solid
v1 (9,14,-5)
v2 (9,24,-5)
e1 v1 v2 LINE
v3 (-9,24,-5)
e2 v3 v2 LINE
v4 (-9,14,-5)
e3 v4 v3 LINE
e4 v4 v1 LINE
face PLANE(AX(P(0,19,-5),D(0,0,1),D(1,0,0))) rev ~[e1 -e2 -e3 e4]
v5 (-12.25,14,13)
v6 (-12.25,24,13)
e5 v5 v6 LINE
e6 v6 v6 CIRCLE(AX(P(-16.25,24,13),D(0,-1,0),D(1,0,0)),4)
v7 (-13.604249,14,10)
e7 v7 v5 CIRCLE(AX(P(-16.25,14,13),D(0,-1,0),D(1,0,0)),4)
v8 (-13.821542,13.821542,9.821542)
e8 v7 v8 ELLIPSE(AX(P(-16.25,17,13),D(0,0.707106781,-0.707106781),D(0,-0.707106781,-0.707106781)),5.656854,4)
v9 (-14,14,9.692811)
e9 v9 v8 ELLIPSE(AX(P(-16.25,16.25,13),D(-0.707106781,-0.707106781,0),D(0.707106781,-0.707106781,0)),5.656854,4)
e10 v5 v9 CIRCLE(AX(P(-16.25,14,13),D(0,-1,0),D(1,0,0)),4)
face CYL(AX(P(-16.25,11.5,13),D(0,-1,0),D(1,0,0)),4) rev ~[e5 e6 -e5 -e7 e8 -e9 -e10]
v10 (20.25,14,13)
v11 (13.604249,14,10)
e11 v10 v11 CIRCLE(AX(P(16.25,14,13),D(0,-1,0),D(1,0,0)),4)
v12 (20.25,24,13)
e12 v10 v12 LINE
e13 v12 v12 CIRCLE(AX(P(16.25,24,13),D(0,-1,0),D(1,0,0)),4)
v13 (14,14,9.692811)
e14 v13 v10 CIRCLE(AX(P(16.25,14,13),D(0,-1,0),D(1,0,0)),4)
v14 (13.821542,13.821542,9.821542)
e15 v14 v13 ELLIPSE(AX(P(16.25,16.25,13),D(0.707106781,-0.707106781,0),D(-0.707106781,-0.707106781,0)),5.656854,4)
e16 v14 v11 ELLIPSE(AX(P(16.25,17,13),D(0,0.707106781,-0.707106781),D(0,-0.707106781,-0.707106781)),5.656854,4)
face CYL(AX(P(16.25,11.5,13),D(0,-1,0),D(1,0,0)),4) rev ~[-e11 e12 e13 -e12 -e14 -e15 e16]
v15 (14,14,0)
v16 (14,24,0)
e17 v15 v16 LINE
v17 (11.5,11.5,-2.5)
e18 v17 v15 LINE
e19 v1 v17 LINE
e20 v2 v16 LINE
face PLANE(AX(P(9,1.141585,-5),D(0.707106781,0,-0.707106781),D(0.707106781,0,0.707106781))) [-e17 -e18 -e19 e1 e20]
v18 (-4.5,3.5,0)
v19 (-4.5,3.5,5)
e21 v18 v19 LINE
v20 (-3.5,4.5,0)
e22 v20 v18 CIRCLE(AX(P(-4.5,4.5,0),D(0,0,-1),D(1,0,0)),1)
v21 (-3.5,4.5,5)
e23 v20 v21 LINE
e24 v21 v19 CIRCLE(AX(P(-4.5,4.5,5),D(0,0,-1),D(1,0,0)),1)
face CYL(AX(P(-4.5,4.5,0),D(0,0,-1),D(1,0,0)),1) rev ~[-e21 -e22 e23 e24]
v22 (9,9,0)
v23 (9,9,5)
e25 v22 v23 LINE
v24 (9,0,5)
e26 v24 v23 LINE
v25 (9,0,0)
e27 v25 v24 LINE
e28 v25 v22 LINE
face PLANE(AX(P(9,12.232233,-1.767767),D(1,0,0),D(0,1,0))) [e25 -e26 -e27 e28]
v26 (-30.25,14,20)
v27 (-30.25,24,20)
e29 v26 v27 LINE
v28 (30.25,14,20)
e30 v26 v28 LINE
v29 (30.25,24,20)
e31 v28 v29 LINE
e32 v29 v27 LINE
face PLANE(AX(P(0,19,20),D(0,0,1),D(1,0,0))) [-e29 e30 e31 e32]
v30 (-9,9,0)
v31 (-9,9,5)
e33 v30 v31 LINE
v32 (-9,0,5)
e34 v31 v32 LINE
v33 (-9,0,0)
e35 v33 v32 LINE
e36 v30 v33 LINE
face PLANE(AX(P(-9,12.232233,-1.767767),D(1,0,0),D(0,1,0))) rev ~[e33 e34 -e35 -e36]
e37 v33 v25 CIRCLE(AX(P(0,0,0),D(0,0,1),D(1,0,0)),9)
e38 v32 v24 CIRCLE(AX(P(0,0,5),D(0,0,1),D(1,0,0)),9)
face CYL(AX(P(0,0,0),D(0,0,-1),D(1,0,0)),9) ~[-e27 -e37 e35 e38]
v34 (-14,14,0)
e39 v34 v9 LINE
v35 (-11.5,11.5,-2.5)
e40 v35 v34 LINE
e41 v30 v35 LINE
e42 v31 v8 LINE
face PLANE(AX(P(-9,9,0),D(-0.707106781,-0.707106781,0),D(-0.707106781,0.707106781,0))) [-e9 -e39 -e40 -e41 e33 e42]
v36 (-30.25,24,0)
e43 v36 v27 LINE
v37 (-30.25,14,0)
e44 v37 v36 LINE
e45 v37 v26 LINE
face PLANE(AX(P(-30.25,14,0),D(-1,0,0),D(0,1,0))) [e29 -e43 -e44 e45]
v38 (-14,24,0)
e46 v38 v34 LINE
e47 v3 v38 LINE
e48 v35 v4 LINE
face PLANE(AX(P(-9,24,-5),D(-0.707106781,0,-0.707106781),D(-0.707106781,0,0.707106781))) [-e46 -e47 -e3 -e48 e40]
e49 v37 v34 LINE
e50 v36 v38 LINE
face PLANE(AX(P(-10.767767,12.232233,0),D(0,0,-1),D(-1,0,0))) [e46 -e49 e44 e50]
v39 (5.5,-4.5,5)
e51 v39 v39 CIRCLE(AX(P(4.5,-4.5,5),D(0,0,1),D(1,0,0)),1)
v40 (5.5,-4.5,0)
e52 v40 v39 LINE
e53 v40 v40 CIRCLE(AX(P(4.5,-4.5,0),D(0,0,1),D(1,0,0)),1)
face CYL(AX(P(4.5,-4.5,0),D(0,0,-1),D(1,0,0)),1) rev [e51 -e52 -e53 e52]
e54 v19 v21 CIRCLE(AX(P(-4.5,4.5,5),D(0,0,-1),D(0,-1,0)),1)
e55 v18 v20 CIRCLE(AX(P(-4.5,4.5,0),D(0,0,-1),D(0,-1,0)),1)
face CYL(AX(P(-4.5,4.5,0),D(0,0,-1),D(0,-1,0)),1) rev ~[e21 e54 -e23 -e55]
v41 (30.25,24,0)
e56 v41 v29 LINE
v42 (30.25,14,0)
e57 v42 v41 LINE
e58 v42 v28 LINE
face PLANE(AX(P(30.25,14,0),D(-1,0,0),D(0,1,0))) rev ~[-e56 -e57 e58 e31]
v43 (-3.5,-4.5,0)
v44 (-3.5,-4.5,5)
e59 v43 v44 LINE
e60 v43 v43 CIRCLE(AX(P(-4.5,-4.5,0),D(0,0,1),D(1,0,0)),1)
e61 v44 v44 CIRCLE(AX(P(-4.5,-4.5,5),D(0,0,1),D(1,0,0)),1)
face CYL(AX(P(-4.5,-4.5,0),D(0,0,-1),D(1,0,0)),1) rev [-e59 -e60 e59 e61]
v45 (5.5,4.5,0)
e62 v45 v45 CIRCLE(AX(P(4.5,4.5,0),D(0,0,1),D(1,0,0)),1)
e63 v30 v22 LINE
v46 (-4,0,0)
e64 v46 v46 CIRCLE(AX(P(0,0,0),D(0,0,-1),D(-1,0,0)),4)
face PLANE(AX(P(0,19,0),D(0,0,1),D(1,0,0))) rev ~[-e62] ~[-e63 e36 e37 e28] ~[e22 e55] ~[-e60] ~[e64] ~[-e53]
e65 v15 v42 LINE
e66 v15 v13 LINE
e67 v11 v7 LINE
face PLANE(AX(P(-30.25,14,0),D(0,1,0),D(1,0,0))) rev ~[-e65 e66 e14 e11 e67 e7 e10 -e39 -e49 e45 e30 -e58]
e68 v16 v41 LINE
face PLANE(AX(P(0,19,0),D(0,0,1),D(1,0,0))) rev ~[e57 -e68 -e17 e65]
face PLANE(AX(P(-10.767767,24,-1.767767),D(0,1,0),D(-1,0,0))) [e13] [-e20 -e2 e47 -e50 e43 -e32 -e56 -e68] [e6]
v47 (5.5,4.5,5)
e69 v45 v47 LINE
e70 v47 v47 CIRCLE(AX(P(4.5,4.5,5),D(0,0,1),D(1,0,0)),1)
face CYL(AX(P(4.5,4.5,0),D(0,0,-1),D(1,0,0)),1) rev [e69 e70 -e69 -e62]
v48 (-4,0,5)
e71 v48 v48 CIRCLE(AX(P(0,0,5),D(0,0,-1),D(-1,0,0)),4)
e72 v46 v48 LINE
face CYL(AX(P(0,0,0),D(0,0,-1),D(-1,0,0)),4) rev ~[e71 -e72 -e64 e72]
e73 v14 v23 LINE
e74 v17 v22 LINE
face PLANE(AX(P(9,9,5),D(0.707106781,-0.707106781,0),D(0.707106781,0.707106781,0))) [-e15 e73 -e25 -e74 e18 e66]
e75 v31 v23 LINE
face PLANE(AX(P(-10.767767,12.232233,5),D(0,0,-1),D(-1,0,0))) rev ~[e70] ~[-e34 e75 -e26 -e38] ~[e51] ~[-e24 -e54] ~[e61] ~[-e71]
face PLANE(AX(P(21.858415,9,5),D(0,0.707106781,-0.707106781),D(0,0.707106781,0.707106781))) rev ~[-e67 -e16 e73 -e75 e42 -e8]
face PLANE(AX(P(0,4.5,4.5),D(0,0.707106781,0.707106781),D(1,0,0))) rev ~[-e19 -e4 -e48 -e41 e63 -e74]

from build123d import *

# Parameters (mm, degrees)
F0_R         = 1
F0_W         = 18
F0_H         = 10
F1_DEPTH     = 5
F0_W_2       = 21.25
F0_R_2       = 4
F2_DEPTH     = 20
F3_R         = 4
F4_DEPTH     = 25
F5_DEPTH     = 5
F6_T4_DEPTH  = 18
F7_T1_DEPTH  = 5
F7_T3_DEPTH  = 18
F7_T8_DEPTH  = 10
F7_T13_DEPTH = 10
F7_T19_DEPTH = 22.8584149398
F7_T24_DEPTH = 17.8584149398
F7_T33_DEPTH = 30.8584149398
F7_S35_R     = 4
F7_T36_DEPTH = 17
F7_T39_DEPTH = 17.8584149398
F7_S41_R     = 4
F7_T42_DEPTH = 11
F7_T48_DEPTH = 30.8584149398
F7_S50_R     = 4
F7_T51_DEPTH = 17
F7_T54_DEPTH = 17.8584149398
F7_S56_R     = 4
F7_T57_DEPTH = 11
F7_T63_DEPTH = 17.8584149398
F7_T69_DEPTH = 22.8584149398


# Not quite as in the source:
# - a fillet or chamfer that OpenCascade refuses, or shapes differently, is made with other operations: its cross-section is extruded or revolved along the edge and cut away or added
# - a feature names something its author has since deleted; it is built from what else it names


with BuildPart() as f1:
    # F0 (on Top) → F1 (new body)
    with BuildSketch(Plane.XY):
        with BuildLine():
            Line((9, 0), (4, 0))
            ThreePointArc((4, 0), (0, -4), (-4, 0))
            Line((-4, 0), (-9, 0))
            ThreePointArc((-9, 0), (0, -9), (9, 0))
        make_face()
        with Locations((-4.5, -4.5)):
            Circle(F0_R, mode=Mode.SUBTRACT)
        with Locations((4.5, -4.5)):
            Circle(F0_R, mode=Mode.SUBTRACT)
        with BuildLine():
            ThreePointArc((-4, 0), (0, 4), (4, 0))
            Line((4, 0), (9, 0))
            ThreePointArc((9, 0), (0, 9), (-9, 0))
            Line((-9, 0), (-4, 0))
        make_face()
        with BuildLine():
            ThreePointArc((-4.5, 3.5), (-5.2071067812, 5.2071067812), (-3.5, 4.5))
            ThreePointArc((-3.5, 4.5), (-3.7928932188, 3.7928932188), (-4.5, 3.5))
        make_face(mode=Mode.SUBTRACT)
        with Locations((4.5, 4.5)):
            Circle(F0_R, mode=Mode.SUBTRACT)
        with BuildLine():
            ThreePointArc((-9, 0), (0, 9), (9, 0))
            Line((9, 0), (9, 14))
            Line((9, 14), (-9, 14))
            Line((-9, 14), (-9, 0))
        make_face()
        with Locations((0, 19)):
            Rectangle(F0_W, F0_H)
    extrude(amount=F1_DEPTH)

    # F0 (on Top) → F2 (join)
    with BuildSketch(Plane.XY):
        with Locations((0, 19)):
            Rectangle(F0_W, F0_H)
        with Locations((-19.625, 19)):
            Rectangle(F0_W_2, F0_H)
        with Locations((-20.25, 19)):
            Circle(F0_R_2, mode=Mode.SUBTRACT)
        with Locations((19.625, 19)):
            Rectangle(F0_W_2, F0_H)
        with Locations((20.25, 19)):
            Circle(F0_R_2, mode=Mode.SUBTRACT)
        with Locations((20.25, 19)):
            Circle(F0_R_2)
        with Locations((-20.25, 19)):
            Circle(F0_R_2)
    extrude(amount=F2_DEPTH)

    # F3 (on Front) → F4 (cut)
    with BuildSketch(Plane.XZ):
        with Locations((-16.25, 13)):
            Circle(F3_R)
        with Locations((16.25, 13)):
            Circle(F3_R)
    extrude(amount=-F4_DEPTH, mode=Mode.SUBTRACT)

    # F0 (on Top) → F5 (join)
    with BuildSketch(Plane.XY):
        with Locations((0, 19)):
            Rectangle(F0_W, F0_H)
    extrude(amount=-F5_DEPTH)

    # F6: chamfer of 5 on 1 edges, made by hand


with BuildPart() as f6_tool2:
    # F6_s3 → F6_t4 (new body)
    with BuildSketch(Plane.YZ.offset(-9)):
        Polygon((9, 0), (14, -5), (14, 0), align=None)
    extrude(amount=F6_T4_DEPTH)

    split(bisect_by=Plane.XY.offset(-5), keep=Keep.TOP)


with BuildPart() as f1_1:
    add(f1.part)

    # F6_t1: union F6_tool2
    add(f6_tool2.part)

    # F7: chamfer of 5 on 5 edges, made by hand

    # F7_s2 → F7_t1 (join)
    with BuildSketch(Plane.XY):
        Polygon((-9, 9), (-14, 14), (-9, 14), align=None)
        Polygon((9, 9), (14, 14), (9, 14), align=None)
    extrude(amount=F7_T1_DEPTH)

    # F7_s4 → F7_t3 (join)
    with BuildSketch(Plane.YZ.offset(-9)):
        Polygon((9, 5), (14, 10), (14, 5), align=None)
    extrude(amount=F7_T3_DEPTH)


with BuildPart() as f7_tool6:
    # F7_s7 → F7_t8 (new body)
    with BuildSketch(Plane.XZ.offset(-14)):
        Polygon((9, -5), (14, 0), (9, 0), align=None)
    extrude(amount=-F7_T8_DEPTH)

    split(bisect_by=Plane.XY.offset(-5), keep=Keep.TOP)


with BuildPart() as f1_2:
    add(f1_1.part)

    # F7_t5: union F7_tool6
    add(f7_tool6.part)


with BuildPart() as f7_tool11:
    # F7_s12 → F7_t13 (new body)
    with BuildSketch(Plane.XZ.offset(-24)):
        Polygon((-9, -5), (-14, 0), (-9, 0), align=None)
    extrude(amount=F7_T13_DEPTH)

    split(bisect_by=Plane.XY.offset(-5), keep=Keep.TOP)


with BuildPart() as f1_3:
    add(f1_2.part)

    # F7_t10: union F7_tool11
    add(f7_tool11.part)


with BuildPart() as f7_tool17:
    # F7_s18 → F7_t19 (new body)
    with BuildSketch(Plane.XZ.offset(-24)):
        Polygon((-9, -5), (-14, 0), (-9, 0), align=None)
    extrude(amount=F7_T19_DEPTH)

    split(bisect_by=Plane(origin=(0, 4.5, 4.5), x_dir=(1, 0, 0), z_dir=(0, 0.7071067812, 0.7071067812)), keep=Keep.TOP)

    split(bisect_by=Plane.XZ.offset(-14), keep=Keep.TOP)


with BuildPart() as f7_tool22:
    # F7_s23 → F7_t24 (new body)
    with BuildSketch(Plane.XY.offset(-12.8584149398)):
        Polygon((-9, 9), (-14, 14), (-9, 14), align=None)
    extrude(amount=F7_T24_DEPTH)

    split(bisect_by=Plane.XY, keep=Keep.BOTTOM)

    split(bisect_by=Plane(origin=(0, 4.5, 4.5), x_dir=(1, 0, 0), z_dir=(0, 0.7071067812, 0.7071067812)), keep=Keep.TOP)

    split(bisect_by=Plane.XY.offset(-5), keep=Keep.TOP)


with BuildPart() as f7_tool17_1:
    add(f7_tool17.part)

    # F7_t28: intersect F7_tool22
    add(f7_tool22.part, mode=Mode.INTERSECT)


with BuildPart() as f1_4:
    add(f1_3.part)

    # F7_t15: union F7_tool17
    add(f7_tool17_1.part)


with BuildPart() as f7_tool31:
    # F7_s32 → F7_t33 (new body)
    with BuildSketch(Plane.YZ.offset(9)):
        Polygon((9, 5), (14, 10), (14, 5), align=None)
    extrude(amount=-F7_T33_DEPTH)

    split(bisect_by=Plane.YZ.offset(-9), keep=Keep.BOTTOM)

    # F7_s35 → F7_t36 (cut, symmetric)
    with BuildSketch(Plane.XZ.offset(-11.5)):
        with Locations((-16.25, 13)):
            Circle(F7_S35_R)
    extrude(amount=F7_T36_DEPTH, both=True, mode=Mode.SUBTRACT)


with BuildPart() as f7_tool37:
    # F7_s38 → F7_t39 (new body)
    with BuildSketch(Plane.XY):
        Polygon((-9, 9), (-14, 14), (-9, 14), align=None)
    extrude(amount=F7_T39_DEPTH)

    split(bisect_by=Plane.XY.offset(5), keep=Keep.TOP)

    # F7_s41 → F7_t42 (cut, symmetric)
    with BuildSketch(Plane.XZ.offset(-11.5)):
        with Locations((-16.25, 13)):
            Circle(F7_S41_R)
    extrude(amount=F7_T42_DEPTH, both=True, mode=Mode.SUBTRACT)


with BuildPart() as f7_tool31_1:
    add(f7_tool31.part)

    # F7_t43: intersect F7_tool37
    add(f7_tool37.part, mode=Mode.INTERSECT)


with BuildPart() as f1_5:
    add(f1_4.part)

    # F7_t29: union F7_tool31
    add(f7_tool31_1.part)


with BuildPart() as f7_tool46:
    # F7_s47 → F7_t48 (new body)
    with BuildSketch(Plane.YZ.offset(21.8584149398)):
        Polygon((9, 5), (14, 10), (14, 5), align=None)
    extrude(amount=-F7_T48_DEPTH)

    split(bisect_by=Plane.YZ.offset(9), keep=Keep.TOP)

    # F7_s50 → F7_t51 (cut, symmetric)
    with BuildSketch(Plane.XZ.offset(-11.5)):
        with Locations((16.25, 13)):
            Circle(F7_S50_R)
    extrude(amount=F7_T51_DEPTH, both=True, mode=Mode.SUBTRACT)


with BuildPart() as f7_tool52:
    # F7_s53 → F7_t54 (new body)
    with BuildSketch(Plane.XY.offset(17.8584149398)):
        Polygon((9, 9), (14, 14), (9, 14), align=None)
    extrude(amount=-F7_T54_DEPTH)

    split(bisect_by=Plane.XY.offset(5), keep=Keep.TOP)

    # F7_s56 → F7_t57 (cut, symmetric)
    with BuildSketch(Plane.XZ.offset(-11.5)):
        with Locations((16.25, 13)):
            Circle(F7_S56_R)
    extrude(amount=F7_T57_DEPTH, both=True, mode=Mode.SUBTRACT)


with BuildPart() as f7_tool46_1:
    add(f7_tool46.part)

    # F7_t58: intersect F7_tool52
    add(f7_tool52.part, mode=Mode.INTERSECT)


with BuildPart() as f1_6:
    add(f1_5.part)

    # F7_t44: union F7_tool46
    add(f7_tool46_1.part)


with BuildPart() as f7_tool61:
    # F7_s62 → F7_t63 (new body)
    with BuildSketch(Plane.XY.offset(5)):
        Polygon((9, 9), (14, 14), (9, 14), align=None)
    extrude(amount=-F7_T63_DEPTH)

    split(bisect_by=Plane.XY, keep=Keep.BOTTOM)

    split(bisect_by=Plane(origin=(0, 4.5, 4.5), x_dir=(1, 0, 0), z_dir=(0, 0.7071067812, 0.7071067812)), keep=Keep.TOP)

    split(bisect_by=Plane.XY.offset(-5), keep=Keep.TOP)


with BuildPart() as f7_tool67:
    # F7_s68 → F7_t69 (new body)
    with BuildSketch(Plane.XZ.offset(-1.1415850602)):
        Polygon((9, -5), (14, 0), (9, 0), align=None)
    extrude(amount=-F7_T69_DEPTH)

    split(bisect_by=Plane(origin=(0, 4.5, 4.5), x_dir=(1, 0, 0), z_dir=(0, 0.7071067812, 0.7071067812)), keep=Keep.TOP)

    split(bisect_by=Plane.XZ.offset(-14), keep=Keep.TOP)


with BuildPart() as f7_tool61_1:
    add(f7_tool61.part)

    # F7_t72: intersect F7_tool67
    add(f7_tool67.part, mode=Mode.INTERSECT)


with BuildPart() as f1_7:
    add(f1_6.part)

    # F7_t59: union F7_tool61
    add(f7_tool61_1.part)


solid = f1_7.part
